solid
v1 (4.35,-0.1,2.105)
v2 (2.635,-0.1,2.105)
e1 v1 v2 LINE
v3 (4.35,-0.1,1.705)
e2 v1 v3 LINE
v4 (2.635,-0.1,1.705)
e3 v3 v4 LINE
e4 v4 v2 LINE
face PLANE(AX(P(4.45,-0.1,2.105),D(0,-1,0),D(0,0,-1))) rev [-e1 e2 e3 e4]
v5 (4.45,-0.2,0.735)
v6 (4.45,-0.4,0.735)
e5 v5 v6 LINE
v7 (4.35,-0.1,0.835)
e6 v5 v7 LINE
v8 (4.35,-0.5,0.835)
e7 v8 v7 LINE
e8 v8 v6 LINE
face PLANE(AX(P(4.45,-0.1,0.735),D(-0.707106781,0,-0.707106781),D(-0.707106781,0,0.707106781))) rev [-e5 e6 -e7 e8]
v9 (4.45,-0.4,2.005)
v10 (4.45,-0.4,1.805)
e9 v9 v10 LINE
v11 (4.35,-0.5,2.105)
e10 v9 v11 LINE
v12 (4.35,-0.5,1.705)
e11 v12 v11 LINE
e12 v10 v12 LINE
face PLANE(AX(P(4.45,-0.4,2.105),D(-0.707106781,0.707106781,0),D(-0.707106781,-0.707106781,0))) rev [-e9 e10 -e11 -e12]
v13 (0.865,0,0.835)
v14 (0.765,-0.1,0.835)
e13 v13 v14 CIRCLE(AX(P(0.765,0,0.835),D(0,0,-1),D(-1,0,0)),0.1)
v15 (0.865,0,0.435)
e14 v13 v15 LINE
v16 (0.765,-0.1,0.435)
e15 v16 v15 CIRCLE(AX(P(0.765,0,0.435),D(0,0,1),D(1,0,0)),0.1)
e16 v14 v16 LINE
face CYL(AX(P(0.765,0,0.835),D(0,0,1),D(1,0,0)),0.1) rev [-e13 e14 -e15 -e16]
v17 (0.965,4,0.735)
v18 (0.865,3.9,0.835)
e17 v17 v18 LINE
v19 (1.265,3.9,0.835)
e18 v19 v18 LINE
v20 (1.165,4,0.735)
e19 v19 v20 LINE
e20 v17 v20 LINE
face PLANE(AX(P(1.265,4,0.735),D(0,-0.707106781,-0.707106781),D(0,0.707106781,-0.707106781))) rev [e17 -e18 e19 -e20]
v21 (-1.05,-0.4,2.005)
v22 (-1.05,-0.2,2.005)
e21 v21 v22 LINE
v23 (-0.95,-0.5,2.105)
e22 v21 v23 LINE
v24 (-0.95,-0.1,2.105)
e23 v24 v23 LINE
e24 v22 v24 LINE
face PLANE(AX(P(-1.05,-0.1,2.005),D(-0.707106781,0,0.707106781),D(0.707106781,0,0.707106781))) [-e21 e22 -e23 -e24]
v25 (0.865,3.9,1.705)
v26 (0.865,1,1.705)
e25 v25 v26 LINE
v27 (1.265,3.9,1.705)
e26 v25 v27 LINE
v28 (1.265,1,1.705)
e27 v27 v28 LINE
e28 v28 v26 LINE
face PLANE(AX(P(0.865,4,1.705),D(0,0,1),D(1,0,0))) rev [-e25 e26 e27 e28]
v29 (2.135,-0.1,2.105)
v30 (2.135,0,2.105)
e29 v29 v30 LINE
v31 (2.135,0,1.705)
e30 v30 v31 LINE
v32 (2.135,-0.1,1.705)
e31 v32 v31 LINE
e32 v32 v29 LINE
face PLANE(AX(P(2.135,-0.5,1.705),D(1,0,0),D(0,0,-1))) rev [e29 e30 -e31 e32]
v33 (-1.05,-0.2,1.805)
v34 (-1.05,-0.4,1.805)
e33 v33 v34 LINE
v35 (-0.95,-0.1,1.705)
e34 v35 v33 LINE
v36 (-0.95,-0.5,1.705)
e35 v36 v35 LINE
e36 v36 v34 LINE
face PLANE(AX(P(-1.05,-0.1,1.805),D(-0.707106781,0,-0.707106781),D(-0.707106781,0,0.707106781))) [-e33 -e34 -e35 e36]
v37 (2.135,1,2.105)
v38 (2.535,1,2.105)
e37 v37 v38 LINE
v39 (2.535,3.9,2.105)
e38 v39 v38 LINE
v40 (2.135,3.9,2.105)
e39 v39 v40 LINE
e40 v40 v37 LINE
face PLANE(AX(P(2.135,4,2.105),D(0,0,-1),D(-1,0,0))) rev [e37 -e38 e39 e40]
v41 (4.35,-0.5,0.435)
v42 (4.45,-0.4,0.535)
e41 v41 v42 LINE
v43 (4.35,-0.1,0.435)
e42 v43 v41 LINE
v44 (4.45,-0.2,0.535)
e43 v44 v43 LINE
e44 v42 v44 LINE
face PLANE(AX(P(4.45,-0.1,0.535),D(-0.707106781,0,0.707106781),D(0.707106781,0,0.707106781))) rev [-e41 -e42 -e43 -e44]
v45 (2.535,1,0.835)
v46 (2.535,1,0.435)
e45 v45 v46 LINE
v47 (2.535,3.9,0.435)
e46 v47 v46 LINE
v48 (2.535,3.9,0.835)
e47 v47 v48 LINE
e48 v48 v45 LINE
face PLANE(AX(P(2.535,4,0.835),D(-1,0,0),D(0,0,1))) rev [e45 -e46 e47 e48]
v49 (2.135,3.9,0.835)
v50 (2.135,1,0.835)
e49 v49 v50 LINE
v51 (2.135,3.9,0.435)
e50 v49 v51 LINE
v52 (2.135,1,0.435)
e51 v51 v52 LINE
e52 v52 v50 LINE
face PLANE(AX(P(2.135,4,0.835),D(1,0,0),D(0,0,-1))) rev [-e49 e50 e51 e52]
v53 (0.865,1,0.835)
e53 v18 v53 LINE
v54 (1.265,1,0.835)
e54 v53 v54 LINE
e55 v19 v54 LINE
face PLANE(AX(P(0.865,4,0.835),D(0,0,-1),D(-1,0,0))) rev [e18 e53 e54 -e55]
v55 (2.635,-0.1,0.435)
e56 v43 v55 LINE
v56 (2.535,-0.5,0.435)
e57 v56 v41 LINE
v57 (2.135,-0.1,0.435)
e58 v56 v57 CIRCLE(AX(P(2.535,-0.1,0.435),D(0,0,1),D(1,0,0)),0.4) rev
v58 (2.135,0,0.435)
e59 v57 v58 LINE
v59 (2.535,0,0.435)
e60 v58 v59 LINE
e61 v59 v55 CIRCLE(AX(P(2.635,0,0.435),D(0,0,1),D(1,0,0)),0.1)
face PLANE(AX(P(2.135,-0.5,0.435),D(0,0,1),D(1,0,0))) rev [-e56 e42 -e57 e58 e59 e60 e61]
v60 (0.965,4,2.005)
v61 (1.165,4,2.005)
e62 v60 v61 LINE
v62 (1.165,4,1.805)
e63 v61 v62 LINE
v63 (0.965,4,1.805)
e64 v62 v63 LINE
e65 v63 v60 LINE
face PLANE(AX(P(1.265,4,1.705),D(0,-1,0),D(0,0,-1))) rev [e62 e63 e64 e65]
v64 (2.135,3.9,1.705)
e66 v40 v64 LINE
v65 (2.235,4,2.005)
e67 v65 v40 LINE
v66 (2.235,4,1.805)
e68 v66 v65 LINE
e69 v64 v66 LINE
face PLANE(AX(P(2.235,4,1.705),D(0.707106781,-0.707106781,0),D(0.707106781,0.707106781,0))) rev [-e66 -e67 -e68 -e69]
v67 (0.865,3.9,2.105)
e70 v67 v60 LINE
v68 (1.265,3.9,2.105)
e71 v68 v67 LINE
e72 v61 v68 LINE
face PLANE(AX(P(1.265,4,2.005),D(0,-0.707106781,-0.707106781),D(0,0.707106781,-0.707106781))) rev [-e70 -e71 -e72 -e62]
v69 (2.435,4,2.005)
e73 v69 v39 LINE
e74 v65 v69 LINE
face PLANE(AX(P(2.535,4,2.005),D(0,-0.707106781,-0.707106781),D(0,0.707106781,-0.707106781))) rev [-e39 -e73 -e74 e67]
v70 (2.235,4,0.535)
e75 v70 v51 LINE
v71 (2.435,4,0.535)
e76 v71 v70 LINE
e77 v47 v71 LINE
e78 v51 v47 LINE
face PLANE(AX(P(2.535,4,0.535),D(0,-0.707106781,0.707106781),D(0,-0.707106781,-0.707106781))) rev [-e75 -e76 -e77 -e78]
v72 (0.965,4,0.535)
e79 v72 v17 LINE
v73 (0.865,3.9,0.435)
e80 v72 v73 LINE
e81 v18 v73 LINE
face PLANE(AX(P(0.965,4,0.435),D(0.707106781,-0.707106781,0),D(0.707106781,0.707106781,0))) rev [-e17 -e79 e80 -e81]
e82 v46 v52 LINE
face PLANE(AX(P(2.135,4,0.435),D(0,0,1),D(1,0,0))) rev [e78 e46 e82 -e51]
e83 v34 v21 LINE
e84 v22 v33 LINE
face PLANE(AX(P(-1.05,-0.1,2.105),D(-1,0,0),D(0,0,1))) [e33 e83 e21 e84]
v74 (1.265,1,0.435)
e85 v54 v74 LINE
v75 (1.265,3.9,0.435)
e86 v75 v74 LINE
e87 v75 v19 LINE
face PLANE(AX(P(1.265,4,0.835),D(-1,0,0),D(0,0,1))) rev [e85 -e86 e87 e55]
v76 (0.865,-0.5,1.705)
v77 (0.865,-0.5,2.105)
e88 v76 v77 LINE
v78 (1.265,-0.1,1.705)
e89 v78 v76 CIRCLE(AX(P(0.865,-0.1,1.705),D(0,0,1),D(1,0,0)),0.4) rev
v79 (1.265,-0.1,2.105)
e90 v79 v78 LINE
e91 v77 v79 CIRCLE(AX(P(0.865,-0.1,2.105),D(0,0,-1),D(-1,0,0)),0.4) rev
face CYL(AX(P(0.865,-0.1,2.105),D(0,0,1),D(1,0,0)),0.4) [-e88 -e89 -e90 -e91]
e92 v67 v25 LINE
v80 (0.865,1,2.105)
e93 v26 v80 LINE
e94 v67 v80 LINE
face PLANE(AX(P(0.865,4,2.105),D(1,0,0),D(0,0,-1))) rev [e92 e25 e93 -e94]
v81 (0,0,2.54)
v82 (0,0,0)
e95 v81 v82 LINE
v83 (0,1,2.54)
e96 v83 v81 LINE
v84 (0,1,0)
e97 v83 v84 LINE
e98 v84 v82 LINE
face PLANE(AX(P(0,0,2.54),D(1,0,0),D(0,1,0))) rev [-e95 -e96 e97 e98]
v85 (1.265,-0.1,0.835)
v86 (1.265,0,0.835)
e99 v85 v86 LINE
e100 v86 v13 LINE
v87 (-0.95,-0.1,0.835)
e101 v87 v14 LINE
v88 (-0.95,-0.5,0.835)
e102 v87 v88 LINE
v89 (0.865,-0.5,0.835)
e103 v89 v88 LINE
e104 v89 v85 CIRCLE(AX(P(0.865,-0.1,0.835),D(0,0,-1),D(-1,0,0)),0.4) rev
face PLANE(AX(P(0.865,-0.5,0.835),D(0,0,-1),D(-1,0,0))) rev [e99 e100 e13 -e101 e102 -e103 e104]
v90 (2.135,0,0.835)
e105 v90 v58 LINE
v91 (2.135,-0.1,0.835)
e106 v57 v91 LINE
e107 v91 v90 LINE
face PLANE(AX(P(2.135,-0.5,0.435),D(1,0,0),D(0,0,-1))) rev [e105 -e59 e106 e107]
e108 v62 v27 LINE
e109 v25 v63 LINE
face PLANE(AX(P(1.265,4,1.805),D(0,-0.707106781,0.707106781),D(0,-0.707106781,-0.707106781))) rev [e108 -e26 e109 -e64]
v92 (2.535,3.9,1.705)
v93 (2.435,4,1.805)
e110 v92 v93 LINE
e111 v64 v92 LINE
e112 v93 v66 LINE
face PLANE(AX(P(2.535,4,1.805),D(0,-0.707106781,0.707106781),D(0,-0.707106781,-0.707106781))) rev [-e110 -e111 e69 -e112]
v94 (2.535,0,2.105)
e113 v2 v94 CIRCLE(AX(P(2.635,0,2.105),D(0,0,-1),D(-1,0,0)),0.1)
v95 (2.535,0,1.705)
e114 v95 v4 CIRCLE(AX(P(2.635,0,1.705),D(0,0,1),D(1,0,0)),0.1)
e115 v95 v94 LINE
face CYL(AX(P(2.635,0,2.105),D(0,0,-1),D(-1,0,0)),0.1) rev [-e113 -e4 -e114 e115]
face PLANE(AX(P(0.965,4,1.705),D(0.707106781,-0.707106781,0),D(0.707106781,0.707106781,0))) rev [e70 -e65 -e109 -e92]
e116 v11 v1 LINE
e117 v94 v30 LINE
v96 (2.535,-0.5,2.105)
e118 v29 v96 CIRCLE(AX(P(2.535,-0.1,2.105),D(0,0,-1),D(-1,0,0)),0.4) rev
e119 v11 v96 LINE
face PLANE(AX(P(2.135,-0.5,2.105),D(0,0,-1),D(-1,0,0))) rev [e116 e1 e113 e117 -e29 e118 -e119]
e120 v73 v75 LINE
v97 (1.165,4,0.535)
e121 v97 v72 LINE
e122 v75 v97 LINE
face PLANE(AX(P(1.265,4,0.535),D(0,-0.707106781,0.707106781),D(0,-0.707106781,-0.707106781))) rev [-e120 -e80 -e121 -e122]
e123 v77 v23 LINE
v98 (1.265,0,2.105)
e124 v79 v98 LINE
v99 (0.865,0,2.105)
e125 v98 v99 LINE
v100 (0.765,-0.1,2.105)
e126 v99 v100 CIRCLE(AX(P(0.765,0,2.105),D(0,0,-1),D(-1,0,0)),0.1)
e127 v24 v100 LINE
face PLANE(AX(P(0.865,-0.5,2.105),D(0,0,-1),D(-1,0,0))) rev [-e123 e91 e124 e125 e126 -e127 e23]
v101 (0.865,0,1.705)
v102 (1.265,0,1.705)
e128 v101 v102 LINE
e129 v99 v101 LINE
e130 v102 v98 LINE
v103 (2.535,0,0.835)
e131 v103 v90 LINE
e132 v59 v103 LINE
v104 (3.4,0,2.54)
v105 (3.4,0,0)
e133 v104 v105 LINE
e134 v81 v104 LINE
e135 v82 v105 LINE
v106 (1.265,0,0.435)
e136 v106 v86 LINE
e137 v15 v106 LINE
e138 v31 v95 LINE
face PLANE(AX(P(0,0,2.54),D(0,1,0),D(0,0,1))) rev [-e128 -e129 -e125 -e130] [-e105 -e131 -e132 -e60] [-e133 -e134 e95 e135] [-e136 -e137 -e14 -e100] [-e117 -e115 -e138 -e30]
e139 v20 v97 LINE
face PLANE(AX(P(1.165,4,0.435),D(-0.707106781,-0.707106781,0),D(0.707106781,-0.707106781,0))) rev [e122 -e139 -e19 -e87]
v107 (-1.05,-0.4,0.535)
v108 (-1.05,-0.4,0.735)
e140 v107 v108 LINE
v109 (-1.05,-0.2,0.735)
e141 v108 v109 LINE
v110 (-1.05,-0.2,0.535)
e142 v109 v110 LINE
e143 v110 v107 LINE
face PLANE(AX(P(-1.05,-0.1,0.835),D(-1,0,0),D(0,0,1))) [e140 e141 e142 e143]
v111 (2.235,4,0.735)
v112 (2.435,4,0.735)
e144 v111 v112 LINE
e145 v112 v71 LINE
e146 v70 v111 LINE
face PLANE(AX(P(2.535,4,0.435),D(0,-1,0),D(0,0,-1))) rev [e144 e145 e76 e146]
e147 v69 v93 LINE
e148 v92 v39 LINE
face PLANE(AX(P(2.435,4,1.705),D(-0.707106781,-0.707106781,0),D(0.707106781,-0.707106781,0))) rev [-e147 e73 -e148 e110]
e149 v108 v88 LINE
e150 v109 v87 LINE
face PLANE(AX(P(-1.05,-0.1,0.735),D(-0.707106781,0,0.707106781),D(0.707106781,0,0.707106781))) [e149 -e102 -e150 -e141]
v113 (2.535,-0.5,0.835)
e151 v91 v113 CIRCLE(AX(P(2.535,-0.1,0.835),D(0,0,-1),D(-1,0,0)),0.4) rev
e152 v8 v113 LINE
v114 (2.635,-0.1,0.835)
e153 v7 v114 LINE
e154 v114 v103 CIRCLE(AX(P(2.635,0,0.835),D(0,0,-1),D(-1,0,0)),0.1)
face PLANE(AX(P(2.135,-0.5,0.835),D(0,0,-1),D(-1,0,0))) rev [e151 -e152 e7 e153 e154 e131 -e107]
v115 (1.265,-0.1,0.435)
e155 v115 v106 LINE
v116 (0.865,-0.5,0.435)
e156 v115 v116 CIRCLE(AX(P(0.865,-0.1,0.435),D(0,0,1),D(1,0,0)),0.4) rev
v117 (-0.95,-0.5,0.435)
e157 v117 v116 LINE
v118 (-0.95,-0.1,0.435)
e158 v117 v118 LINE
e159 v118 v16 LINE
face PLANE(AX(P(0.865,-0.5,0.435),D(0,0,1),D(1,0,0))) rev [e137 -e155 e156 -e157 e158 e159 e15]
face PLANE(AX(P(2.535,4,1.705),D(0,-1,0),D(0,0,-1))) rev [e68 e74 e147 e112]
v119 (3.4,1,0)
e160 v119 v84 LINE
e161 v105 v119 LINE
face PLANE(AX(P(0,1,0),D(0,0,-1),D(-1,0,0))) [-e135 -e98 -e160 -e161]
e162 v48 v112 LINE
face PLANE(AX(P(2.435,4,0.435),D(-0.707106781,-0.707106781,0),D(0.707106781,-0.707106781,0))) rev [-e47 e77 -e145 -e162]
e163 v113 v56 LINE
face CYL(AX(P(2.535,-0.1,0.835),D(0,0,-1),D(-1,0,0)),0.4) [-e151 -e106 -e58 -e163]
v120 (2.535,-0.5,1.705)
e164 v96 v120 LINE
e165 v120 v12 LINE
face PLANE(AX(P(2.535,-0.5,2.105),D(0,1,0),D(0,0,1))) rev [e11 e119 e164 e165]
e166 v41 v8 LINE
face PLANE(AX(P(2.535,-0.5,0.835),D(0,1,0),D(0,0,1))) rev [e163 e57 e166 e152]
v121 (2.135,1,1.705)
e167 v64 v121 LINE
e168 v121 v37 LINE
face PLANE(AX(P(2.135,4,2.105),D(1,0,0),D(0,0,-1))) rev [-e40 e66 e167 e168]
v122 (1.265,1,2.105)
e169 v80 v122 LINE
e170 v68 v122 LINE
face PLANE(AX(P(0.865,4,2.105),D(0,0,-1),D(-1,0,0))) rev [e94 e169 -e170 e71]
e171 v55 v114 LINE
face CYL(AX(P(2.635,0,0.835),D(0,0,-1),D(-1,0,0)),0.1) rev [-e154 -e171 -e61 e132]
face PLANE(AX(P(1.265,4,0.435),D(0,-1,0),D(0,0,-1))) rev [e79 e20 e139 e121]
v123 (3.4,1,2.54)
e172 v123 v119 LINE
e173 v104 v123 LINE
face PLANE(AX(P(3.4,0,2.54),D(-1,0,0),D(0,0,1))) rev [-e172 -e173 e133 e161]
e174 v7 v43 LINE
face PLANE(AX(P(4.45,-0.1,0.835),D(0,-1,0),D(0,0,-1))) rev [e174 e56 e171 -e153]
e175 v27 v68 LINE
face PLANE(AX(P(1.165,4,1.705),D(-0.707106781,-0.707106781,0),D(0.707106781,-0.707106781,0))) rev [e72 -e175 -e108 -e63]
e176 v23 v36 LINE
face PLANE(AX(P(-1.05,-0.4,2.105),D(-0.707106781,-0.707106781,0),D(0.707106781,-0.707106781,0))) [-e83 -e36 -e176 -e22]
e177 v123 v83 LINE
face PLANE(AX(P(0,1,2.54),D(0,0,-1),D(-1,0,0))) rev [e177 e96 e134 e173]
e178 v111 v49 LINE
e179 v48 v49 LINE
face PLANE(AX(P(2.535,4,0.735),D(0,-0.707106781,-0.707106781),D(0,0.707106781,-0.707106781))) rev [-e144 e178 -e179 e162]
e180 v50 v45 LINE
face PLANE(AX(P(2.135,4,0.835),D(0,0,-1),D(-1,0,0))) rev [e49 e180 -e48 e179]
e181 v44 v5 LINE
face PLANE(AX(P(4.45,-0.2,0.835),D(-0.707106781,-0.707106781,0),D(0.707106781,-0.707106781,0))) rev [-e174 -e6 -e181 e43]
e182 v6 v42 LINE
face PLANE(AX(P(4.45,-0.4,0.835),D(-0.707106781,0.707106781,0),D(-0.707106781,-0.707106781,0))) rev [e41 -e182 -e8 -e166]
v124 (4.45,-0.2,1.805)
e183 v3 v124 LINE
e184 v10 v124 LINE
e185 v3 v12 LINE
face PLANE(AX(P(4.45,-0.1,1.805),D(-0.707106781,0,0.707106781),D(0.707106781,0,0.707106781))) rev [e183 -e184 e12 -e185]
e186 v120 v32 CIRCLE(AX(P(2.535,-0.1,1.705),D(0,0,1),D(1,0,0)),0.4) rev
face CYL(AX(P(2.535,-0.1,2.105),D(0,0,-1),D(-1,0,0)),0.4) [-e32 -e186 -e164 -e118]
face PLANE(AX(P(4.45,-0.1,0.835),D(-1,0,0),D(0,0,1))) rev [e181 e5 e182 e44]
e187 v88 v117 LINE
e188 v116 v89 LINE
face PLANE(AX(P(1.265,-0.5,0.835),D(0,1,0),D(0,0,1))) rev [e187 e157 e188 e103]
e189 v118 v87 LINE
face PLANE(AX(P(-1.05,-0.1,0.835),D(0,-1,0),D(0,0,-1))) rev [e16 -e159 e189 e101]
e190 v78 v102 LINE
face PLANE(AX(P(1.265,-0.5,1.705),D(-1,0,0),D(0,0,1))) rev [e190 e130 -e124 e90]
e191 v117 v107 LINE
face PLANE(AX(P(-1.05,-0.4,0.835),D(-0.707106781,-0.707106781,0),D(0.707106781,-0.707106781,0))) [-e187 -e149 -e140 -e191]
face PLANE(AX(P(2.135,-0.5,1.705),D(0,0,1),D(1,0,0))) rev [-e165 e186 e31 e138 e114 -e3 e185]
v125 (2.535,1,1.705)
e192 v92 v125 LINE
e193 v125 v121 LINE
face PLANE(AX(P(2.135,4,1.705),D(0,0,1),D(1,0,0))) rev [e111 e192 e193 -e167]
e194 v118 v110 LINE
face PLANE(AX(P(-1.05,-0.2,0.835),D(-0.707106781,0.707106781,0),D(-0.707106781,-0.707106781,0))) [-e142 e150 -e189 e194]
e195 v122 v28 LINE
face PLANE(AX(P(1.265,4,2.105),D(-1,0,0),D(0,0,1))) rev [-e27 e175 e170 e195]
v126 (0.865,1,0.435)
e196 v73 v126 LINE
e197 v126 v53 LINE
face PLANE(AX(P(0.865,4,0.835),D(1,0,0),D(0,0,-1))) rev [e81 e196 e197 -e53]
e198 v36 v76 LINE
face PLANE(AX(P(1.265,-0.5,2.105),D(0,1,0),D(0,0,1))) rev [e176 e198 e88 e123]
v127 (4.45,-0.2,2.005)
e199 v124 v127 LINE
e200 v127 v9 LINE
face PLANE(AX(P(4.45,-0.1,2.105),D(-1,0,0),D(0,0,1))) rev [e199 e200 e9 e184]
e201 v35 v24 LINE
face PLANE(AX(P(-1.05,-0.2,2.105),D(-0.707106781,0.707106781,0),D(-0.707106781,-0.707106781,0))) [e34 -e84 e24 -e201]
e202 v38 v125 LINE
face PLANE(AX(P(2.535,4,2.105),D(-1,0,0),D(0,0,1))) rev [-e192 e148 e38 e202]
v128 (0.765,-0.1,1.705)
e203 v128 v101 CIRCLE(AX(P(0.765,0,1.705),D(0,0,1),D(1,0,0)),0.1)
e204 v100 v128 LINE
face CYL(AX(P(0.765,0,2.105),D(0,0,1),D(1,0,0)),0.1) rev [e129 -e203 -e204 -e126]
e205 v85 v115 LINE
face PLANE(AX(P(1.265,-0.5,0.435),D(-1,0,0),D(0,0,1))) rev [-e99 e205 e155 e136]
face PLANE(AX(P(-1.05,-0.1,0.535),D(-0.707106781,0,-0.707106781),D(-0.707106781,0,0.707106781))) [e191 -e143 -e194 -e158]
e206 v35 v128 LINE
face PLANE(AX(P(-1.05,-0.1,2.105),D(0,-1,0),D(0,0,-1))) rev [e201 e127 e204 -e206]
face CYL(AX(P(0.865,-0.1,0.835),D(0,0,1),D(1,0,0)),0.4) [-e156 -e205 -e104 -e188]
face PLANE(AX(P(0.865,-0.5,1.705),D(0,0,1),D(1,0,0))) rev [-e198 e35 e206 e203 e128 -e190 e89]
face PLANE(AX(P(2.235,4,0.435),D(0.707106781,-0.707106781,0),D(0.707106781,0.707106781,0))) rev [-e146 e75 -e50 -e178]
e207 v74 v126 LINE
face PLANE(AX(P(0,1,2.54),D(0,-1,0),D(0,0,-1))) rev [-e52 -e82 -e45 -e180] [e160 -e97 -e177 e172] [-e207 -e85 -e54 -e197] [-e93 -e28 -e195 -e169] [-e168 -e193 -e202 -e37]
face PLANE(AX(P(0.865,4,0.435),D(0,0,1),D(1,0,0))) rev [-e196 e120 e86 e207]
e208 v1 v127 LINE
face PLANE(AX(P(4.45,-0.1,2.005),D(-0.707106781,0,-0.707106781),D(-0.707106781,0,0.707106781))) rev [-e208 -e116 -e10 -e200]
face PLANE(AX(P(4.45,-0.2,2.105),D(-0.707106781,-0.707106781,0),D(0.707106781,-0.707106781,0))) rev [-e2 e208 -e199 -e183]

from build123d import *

# Parameters (mm, degrees)
SKIZZE1_W                       = 3.4
SKIZZE1_H                       = 1
AUFSATZ_LINEAR_AUSTRAGEN1_DEPTH = 2.54
SKIZZE3_W                       = 0.4
SKIZZE3_H                       = 0.4
AUFSATZ_LINEAR_AUSTRAGEN3_DEPTH = 0.5
SKIZZE4_W                       = 0.4
SKIZZE4_H                       = 0.4
AUFSATZ_LINEAR_AUSTRAGEN4_DEPTH = 1.915
SKIZZE5_W                       = 0.4
SKIZZE5_H                       = 0.4
AUFSATZ_LINEAR_AUSTRAGEN5_DEPTH = 1.915
SKIZZE6_W                       = 0.4
SKIZZE6_H                       = 0.4
AUFSATZ_LINEAR_AUSTRAGEN6_DEPTH = 3
FASE2_SIZE                      = 0.1
VERRUNDUNG1_R                   = 0.1
VERRUNDUNG2_R                   = 0.4


with BuildPart() as part:
    # Skizze1 → Aufsatz-Linear austragen1 (new body)
    with BuildSketch(Plane.XY):
        with Locations((1.7, 0.5)):
            Rectangle(SKIZZE1_W, SKIZZE1_H)
    extrude(amount=AUFSATZ_LINEAR_AUSTRAGEN1_DEPTH)

    # Skizze3 → Aufsatz-Linear austragen3 (add)
    with BuildSketch(Plane.XZ):
        with Locations((1.065, 1.905)):
            Rectangle(SKIZZE3_W, SKIZZE3_H)
        with Locations((2.335, 1.905)):
            Rectangle(SKIZZE3_W, SKIZZE3_H)
        with Locations((1.065, 0.635)):
            Rectangle(SKIZZE3_W, SKIZZE3_H)
        with Locations((2.335, 0.635)):
            Rectangle(SKIZZE3_W, SKIZZE3_H)
    extrude(amount=AUFSATZ_LINEAR_AUSTRAGEN3_DEPTH)

    # Skizze4 → Aufsatz-Linear austragen4 (add)
    with BuildSketch(Plane(origin=(2.535, 0, 0), x_dir=(0, 0, -1), z_dir=(1, 0, 0))):
        with Locations((-1.905, -0.3)):
            Rectangle(SKIZZE4_W, SKIZZE4_H)
        with Locations((-0.635, -0.3)):
            Rectangle(SKIZZE4_W, SKIZZE4_H)
    extrude(amount=AUFSATZ_LINEAR_AUSTRAGEN4_DEPTH)

    # Skizze5 → Aufsatz-Linear austragen5 (add)
    with BuildSketch(Plane.ZY.offset(-0.865)):
        with Locations((1.905, -0.3)):
            Rectangle(SKIZZE5_W, SKIZZE5_H)
        with Locations((0.635, -0.3)):
            Rectangle(SKIZZE5_W, SKIZZE5_H)
    extrude(amount=AUFSATZ_LINEAR_AUSTRAGEN5_DEPTH)

    # Skizze6 → Aufsatz-Linear austragen6 (add)
    with BuildSketch(Plane(origin=(0, 1, 0), x_dir=(1, 0, 0), z_dir=(0, 1, 0))):
        with Locations((1.065, -0.635)):
            Rectangle(SKIZZE6_W, SKIZZE6_H)
        with Locations((2.335, -0.635)):
            Rectangle(SKIZZE6_W, SKIZZE6_H)
        with Locations((1.065, -1.905)):
            Rectangle(SKIZZE6_W, SKIZZE6_H)
        with Locations((2.335, -1.905)):
            Rectangle(SKIZZE6_W, SKIZZE6_H)
    extrude(amount=AUFSATZ_LINEAR_AUSTRAGEN6_DEPTH)

    # Fase2
    fase2_edges = [part.edges().sort_by_distance(p)[0] for p in [
        (-1.05, -0.3, 0.435),
        (-1.05, -0.5, 0.635),
        (1.265, 4, 0.635),
        (1.065, 4, 0.435),
        (0.865, 4, 0.635),
        (1.065, 4, 0.835),
        (2.535, 4, 0.635),
        (2.335, 4, 0.435),
        (2.135, 4, 0.635),
        (2.335, 4, 0.835),
        (1.265, 4, 1.905),
        (1.065, 4, 1.705),
        (0.865, 4, 1.905),
        (1.065, 4, 2.105),
        (2.535, 4, 1.905),
        (2.335, 4, 1.705),
        (2.135, 4, 1.905),
        (2.335, 4, 2.105),
        (4.45, -0.3, 2.105),
        (4.45, -0.5, 1.905),
        (4.45, -0.3, 1.705),
        (4.45, -0.1, 1.905),
        (4.45, -0.3, 0.835),
        (4.45, -0.5, 0.635),
        (4.45, -0.3, 0.435),
        (4.45, -0.1, 0.635),
        (-1.05, -0.3, 2.105),
        (-1.05, -0.1, 1.905),
        (-1.05, -0.3, 1.705),
        (-1.05, -0.5, 1.905),
        (-1.05, -0.3, 0.835),
        (-1.05, -0.1, 0.635),
    ]]
    chamfer(fase2_edges, length=FASE2_SIZE)

    # Verrundung1
    verrundung1_edges = [part.edges().sort_by_distance(p)[0] for p in [
        (0.865, -0.1, 1.905),
        (0.865, -0.1, 0.635),
        (2.535, -0.1, 1.905),
        (2.535, -0.1, 0.635),
    ]]
    fillet(verrundung1_edges, radius=VERRUNDUNG1_R - 0.0001)  # a hair under: the kernel refuses the full size

    # Verrundung2
    verrundung2_edges = [part.edges().sort_by_distance(p)[0] for p in [
        (1.265, -0.5, 1.905),
        (2.135, -0.5, 1.905),
        (1.265, -0.5, 0.635),
        (2.135, -0.5, 0.635),
    ]]
    fillet(verrundung2_edges, radius=VERRUNDUNG2_R)


solid = part.part
